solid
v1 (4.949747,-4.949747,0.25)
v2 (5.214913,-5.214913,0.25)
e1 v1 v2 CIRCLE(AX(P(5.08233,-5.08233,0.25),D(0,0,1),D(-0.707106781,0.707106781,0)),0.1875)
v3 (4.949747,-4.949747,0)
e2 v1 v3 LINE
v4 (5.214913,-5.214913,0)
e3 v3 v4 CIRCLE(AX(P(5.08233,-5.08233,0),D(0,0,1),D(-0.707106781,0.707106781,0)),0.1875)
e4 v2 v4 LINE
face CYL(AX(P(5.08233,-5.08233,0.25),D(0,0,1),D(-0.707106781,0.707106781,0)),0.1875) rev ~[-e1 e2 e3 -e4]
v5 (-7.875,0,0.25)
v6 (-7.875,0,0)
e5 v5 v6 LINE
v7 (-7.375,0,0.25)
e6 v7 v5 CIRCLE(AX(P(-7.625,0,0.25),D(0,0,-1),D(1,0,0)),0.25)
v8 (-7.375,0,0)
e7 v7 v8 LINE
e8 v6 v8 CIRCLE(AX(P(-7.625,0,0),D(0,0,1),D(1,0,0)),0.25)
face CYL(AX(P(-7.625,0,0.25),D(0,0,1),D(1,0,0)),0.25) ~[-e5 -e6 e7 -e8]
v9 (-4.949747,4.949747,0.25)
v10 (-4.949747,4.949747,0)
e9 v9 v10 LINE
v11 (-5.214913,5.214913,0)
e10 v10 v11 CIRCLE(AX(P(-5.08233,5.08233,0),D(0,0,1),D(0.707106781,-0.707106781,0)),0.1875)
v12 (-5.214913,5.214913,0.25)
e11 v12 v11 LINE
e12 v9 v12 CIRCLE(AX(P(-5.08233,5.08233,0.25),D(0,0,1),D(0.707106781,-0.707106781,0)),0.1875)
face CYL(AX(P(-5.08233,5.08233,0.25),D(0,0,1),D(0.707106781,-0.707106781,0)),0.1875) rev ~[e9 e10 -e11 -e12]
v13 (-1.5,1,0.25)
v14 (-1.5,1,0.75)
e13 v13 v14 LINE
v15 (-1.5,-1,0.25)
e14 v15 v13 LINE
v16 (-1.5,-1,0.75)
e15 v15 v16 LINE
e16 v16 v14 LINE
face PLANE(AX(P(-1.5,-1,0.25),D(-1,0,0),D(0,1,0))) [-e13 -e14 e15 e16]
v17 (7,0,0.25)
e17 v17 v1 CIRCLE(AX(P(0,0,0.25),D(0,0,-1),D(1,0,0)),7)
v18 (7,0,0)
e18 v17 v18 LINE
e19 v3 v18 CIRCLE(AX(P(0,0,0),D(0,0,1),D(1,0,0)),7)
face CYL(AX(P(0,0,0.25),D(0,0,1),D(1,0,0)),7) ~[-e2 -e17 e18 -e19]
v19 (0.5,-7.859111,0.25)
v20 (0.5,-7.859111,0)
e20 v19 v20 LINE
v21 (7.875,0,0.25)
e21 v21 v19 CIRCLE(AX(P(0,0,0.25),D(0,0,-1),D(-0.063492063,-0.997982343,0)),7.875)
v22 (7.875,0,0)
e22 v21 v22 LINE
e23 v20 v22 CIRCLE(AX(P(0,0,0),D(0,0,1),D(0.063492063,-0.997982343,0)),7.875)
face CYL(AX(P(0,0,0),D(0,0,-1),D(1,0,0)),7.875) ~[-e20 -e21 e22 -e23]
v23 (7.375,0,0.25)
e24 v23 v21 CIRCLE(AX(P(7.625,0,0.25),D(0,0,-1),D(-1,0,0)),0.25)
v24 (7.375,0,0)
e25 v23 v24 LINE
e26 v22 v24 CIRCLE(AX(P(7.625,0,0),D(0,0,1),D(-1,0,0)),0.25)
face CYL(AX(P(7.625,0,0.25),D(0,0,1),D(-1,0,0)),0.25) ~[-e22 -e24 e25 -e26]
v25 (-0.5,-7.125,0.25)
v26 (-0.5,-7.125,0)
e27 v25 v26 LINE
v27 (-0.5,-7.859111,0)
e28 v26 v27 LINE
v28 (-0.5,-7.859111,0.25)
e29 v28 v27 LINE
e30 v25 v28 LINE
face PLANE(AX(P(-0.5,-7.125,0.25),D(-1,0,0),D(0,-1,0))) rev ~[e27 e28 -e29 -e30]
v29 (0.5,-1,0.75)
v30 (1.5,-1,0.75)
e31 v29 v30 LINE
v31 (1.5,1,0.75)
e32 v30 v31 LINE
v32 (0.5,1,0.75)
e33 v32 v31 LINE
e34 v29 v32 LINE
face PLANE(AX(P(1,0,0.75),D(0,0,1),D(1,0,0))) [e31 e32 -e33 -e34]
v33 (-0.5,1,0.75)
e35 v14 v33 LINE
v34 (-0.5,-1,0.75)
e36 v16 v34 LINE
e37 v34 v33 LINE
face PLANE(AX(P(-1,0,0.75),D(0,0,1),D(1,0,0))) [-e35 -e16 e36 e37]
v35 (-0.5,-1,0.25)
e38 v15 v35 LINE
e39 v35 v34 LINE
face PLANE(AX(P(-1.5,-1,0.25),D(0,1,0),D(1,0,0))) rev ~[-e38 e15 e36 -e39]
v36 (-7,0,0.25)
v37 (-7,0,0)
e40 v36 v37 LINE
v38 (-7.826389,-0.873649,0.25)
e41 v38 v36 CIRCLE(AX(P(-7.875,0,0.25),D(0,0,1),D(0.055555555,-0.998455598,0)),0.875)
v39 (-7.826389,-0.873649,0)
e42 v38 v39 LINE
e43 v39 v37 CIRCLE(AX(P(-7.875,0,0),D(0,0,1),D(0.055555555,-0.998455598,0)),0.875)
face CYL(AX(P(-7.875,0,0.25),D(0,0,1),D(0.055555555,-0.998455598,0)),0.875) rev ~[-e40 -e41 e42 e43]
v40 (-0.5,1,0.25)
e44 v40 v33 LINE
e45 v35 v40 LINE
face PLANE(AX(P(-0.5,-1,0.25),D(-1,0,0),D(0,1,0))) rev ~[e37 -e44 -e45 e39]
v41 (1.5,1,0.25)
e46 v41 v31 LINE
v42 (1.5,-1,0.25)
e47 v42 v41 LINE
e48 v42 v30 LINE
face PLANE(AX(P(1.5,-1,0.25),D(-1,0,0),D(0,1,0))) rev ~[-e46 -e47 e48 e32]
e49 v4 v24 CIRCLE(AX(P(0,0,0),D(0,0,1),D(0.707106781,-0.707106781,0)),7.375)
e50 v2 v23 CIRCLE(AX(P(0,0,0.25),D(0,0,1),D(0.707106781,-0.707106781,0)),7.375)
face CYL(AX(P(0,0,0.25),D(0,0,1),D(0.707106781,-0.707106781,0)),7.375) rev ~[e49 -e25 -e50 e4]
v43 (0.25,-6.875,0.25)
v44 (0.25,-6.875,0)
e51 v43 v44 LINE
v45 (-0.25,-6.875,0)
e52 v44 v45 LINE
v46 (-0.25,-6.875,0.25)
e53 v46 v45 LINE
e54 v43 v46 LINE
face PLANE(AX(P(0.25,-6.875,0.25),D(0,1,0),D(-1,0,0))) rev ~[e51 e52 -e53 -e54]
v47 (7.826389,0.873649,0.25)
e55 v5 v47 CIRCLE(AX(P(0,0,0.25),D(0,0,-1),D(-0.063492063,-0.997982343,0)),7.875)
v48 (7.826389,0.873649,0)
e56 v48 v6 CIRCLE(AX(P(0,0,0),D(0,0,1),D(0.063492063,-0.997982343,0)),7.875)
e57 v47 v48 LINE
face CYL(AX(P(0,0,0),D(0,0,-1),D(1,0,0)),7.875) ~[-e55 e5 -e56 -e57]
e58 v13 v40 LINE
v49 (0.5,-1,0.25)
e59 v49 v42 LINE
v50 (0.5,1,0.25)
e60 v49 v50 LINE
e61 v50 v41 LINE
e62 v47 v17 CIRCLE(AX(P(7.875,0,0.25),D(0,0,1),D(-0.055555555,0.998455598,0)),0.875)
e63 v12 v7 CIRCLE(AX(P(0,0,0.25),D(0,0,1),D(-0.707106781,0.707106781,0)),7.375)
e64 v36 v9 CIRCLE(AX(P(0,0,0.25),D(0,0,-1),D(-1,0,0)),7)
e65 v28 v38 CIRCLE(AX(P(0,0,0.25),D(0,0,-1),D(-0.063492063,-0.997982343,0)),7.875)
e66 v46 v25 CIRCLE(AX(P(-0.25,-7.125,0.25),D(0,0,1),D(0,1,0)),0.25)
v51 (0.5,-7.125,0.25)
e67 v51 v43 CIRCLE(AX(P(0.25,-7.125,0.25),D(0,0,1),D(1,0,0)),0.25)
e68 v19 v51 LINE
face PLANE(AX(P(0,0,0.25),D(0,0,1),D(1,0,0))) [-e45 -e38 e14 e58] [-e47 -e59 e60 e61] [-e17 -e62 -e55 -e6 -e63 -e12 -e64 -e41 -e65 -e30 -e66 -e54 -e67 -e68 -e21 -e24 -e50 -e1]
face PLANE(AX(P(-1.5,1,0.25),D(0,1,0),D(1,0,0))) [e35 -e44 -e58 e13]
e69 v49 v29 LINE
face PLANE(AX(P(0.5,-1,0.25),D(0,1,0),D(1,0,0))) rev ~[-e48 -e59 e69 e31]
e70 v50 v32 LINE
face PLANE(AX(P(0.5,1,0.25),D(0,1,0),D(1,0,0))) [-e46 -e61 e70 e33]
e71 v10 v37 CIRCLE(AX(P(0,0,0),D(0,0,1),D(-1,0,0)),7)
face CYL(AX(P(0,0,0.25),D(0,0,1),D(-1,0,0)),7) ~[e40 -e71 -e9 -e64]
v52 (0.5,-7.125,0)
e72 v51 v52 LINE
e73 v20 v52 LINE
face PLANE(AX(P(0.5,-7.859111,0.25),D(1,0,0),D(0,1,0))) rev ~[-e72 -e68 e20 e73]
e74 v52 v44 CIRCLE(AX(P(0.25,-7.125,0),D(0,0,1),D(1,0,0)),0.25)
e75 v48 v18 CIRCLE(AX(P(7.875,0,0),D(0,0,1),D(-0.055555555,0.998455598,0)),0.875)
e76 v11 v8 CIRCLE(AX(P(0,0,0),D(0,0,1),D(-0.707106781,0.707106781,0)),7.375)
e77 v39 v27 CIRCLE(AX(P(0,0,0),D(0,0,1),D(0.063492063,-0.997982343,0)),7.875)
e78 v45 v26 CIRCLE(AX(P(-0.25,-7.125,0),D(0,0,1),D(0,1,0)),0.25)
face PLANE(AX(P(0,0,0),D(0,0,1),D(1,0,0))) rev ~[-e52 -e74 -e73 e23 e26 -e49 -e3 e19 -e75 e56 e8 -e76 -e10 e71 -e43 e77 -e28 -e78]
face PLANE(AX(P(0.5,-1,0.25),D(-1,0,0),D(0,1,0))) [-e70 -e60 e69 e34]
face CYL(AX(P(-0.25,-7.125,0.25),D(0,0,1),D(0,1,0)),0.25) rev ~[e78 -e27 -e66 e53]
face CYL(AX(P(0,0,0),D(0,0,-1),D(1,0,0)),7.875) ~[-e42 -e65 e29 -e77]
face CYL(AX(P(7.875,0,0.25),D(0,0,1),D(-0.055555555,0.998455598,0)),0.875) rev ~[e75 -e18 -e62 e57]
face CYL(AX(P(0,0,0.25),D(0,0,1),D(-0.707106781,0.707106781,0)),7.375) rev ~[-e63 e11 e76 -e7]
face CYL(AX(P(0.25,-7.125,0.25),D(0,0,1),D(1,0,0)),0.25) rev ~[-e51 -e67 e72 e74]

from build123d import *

# Parameters (mm, degrees)
F0_R     = 7.875
F1_DEPTH = 0.25
F2_W     = 1
F2_H     = 2
F3_DEPTH = 0.5
F5_DEPTH = 0.5
F7_DEPTH = 1


# Not quite as in the source:
# - a feature names something its author has since deleted; it is built from what else it names


with BuildPart() as f1:
    # F0 (on Top) → F1 (new body)
    with BuildSketch(Plane.XY):
        Circle(F0_R)
    extrude(amount=F1_DEPTH)

    # F2 (on face) → F3 (join)
    with BuildSketch(Plane.XY.offset(0.25)):
        with Locations((-1, 0)):
            Rectangle(F2_W, F2_H)
        with Locations((1, 0)):
            Rectangle(F2_W, F2_H)
    extrude(amount=F3_DEPTH)

    # F4 (on face) → F5 (cut)
    with BuildSketch(Plane.XY.offset(0.25)):
        with BuildLine():
            ThreePointArc((-0.5, -7.8591109548), (0, -7.875), (0.5, -7.8591109548))
            Line((0.5, -7.8591109548), (0.5, -7.125))
            ThreePointArc((0.5, -7.125), (0.4267766953, -6.9482233047), (0.25, -6.875))
            Line((0.25, -6.875), (-0.25, -6.875))
            ThreePointArc((-0.25, -6.875), (-0.4267766953, -6.9482233047), (-0.5, -7.125))
            Line((-0.5, -7.125), (-0.5, -7.8591109548))
        make_face()
    extrude(amount=-F5_DEPTH, mode=Mode.SUBTRACT)

    # F6 (on face) → F7 (cut)
    with BuildSketch(Plane.XY.offset(0.25)):
        with BuildLine():
            ThreePointArc((-5.2149125113, 5.2149125113), (-6.8136115523, 2.8222903137), (-7.375, 0))
            ThreePointArc((-7.375, 0), (-7.625, -0.25), (-7.875, 0))
            ThreePointArc((-7.875, 0), (-7.8628378306, -0.4375), (-7.8263888889, -0.8736486478))
            ThreePointArc((-7.8263888889, -0.8736486478), (-7.2393272374, -0.6012862371), (-7, 0))
            ThreePointArc((-7, 0), (-6.4671567276, 2.6787840266), (-4.9497474683, 4.9497474683))
            ThreePointArc((-4.9497474683, 4.9497474683), (-4.9497474683, 5.2149125113), (-5.2149125113, 5.2149125113))
        make_face()
        with BuildLine():
            ThreePointArc((7.875, 0), (7.8628378306, 0.4375), (7.8263888889, 0.8736486478))
            ThreePointArc((7.8263888889, 0.8736486478), (7.2393272374, 0.6012862371), (7, 0))
            ThreePointArc((7, 0), (6.4671567276, -2.6787840266), (4.9497474683, -4.9497474683))
            ThreePointArc((4.9497474683, -4.9497474683), (4.9497474683, -5.2149125113), (5.2149125113, -5.2149125113))
            ThreePointArc((5.2149125113, -5.2149125113), (6.8136115523, -2.8222903137), (7.375, 0))
            ThreePointArc((7.375, 0), (7.625, 0.25), (7.875, 0))
        make_face()
    extrude(amount=-F7_DEPTH, mode=Mode.SUBTRACT)


solid = f1.part
